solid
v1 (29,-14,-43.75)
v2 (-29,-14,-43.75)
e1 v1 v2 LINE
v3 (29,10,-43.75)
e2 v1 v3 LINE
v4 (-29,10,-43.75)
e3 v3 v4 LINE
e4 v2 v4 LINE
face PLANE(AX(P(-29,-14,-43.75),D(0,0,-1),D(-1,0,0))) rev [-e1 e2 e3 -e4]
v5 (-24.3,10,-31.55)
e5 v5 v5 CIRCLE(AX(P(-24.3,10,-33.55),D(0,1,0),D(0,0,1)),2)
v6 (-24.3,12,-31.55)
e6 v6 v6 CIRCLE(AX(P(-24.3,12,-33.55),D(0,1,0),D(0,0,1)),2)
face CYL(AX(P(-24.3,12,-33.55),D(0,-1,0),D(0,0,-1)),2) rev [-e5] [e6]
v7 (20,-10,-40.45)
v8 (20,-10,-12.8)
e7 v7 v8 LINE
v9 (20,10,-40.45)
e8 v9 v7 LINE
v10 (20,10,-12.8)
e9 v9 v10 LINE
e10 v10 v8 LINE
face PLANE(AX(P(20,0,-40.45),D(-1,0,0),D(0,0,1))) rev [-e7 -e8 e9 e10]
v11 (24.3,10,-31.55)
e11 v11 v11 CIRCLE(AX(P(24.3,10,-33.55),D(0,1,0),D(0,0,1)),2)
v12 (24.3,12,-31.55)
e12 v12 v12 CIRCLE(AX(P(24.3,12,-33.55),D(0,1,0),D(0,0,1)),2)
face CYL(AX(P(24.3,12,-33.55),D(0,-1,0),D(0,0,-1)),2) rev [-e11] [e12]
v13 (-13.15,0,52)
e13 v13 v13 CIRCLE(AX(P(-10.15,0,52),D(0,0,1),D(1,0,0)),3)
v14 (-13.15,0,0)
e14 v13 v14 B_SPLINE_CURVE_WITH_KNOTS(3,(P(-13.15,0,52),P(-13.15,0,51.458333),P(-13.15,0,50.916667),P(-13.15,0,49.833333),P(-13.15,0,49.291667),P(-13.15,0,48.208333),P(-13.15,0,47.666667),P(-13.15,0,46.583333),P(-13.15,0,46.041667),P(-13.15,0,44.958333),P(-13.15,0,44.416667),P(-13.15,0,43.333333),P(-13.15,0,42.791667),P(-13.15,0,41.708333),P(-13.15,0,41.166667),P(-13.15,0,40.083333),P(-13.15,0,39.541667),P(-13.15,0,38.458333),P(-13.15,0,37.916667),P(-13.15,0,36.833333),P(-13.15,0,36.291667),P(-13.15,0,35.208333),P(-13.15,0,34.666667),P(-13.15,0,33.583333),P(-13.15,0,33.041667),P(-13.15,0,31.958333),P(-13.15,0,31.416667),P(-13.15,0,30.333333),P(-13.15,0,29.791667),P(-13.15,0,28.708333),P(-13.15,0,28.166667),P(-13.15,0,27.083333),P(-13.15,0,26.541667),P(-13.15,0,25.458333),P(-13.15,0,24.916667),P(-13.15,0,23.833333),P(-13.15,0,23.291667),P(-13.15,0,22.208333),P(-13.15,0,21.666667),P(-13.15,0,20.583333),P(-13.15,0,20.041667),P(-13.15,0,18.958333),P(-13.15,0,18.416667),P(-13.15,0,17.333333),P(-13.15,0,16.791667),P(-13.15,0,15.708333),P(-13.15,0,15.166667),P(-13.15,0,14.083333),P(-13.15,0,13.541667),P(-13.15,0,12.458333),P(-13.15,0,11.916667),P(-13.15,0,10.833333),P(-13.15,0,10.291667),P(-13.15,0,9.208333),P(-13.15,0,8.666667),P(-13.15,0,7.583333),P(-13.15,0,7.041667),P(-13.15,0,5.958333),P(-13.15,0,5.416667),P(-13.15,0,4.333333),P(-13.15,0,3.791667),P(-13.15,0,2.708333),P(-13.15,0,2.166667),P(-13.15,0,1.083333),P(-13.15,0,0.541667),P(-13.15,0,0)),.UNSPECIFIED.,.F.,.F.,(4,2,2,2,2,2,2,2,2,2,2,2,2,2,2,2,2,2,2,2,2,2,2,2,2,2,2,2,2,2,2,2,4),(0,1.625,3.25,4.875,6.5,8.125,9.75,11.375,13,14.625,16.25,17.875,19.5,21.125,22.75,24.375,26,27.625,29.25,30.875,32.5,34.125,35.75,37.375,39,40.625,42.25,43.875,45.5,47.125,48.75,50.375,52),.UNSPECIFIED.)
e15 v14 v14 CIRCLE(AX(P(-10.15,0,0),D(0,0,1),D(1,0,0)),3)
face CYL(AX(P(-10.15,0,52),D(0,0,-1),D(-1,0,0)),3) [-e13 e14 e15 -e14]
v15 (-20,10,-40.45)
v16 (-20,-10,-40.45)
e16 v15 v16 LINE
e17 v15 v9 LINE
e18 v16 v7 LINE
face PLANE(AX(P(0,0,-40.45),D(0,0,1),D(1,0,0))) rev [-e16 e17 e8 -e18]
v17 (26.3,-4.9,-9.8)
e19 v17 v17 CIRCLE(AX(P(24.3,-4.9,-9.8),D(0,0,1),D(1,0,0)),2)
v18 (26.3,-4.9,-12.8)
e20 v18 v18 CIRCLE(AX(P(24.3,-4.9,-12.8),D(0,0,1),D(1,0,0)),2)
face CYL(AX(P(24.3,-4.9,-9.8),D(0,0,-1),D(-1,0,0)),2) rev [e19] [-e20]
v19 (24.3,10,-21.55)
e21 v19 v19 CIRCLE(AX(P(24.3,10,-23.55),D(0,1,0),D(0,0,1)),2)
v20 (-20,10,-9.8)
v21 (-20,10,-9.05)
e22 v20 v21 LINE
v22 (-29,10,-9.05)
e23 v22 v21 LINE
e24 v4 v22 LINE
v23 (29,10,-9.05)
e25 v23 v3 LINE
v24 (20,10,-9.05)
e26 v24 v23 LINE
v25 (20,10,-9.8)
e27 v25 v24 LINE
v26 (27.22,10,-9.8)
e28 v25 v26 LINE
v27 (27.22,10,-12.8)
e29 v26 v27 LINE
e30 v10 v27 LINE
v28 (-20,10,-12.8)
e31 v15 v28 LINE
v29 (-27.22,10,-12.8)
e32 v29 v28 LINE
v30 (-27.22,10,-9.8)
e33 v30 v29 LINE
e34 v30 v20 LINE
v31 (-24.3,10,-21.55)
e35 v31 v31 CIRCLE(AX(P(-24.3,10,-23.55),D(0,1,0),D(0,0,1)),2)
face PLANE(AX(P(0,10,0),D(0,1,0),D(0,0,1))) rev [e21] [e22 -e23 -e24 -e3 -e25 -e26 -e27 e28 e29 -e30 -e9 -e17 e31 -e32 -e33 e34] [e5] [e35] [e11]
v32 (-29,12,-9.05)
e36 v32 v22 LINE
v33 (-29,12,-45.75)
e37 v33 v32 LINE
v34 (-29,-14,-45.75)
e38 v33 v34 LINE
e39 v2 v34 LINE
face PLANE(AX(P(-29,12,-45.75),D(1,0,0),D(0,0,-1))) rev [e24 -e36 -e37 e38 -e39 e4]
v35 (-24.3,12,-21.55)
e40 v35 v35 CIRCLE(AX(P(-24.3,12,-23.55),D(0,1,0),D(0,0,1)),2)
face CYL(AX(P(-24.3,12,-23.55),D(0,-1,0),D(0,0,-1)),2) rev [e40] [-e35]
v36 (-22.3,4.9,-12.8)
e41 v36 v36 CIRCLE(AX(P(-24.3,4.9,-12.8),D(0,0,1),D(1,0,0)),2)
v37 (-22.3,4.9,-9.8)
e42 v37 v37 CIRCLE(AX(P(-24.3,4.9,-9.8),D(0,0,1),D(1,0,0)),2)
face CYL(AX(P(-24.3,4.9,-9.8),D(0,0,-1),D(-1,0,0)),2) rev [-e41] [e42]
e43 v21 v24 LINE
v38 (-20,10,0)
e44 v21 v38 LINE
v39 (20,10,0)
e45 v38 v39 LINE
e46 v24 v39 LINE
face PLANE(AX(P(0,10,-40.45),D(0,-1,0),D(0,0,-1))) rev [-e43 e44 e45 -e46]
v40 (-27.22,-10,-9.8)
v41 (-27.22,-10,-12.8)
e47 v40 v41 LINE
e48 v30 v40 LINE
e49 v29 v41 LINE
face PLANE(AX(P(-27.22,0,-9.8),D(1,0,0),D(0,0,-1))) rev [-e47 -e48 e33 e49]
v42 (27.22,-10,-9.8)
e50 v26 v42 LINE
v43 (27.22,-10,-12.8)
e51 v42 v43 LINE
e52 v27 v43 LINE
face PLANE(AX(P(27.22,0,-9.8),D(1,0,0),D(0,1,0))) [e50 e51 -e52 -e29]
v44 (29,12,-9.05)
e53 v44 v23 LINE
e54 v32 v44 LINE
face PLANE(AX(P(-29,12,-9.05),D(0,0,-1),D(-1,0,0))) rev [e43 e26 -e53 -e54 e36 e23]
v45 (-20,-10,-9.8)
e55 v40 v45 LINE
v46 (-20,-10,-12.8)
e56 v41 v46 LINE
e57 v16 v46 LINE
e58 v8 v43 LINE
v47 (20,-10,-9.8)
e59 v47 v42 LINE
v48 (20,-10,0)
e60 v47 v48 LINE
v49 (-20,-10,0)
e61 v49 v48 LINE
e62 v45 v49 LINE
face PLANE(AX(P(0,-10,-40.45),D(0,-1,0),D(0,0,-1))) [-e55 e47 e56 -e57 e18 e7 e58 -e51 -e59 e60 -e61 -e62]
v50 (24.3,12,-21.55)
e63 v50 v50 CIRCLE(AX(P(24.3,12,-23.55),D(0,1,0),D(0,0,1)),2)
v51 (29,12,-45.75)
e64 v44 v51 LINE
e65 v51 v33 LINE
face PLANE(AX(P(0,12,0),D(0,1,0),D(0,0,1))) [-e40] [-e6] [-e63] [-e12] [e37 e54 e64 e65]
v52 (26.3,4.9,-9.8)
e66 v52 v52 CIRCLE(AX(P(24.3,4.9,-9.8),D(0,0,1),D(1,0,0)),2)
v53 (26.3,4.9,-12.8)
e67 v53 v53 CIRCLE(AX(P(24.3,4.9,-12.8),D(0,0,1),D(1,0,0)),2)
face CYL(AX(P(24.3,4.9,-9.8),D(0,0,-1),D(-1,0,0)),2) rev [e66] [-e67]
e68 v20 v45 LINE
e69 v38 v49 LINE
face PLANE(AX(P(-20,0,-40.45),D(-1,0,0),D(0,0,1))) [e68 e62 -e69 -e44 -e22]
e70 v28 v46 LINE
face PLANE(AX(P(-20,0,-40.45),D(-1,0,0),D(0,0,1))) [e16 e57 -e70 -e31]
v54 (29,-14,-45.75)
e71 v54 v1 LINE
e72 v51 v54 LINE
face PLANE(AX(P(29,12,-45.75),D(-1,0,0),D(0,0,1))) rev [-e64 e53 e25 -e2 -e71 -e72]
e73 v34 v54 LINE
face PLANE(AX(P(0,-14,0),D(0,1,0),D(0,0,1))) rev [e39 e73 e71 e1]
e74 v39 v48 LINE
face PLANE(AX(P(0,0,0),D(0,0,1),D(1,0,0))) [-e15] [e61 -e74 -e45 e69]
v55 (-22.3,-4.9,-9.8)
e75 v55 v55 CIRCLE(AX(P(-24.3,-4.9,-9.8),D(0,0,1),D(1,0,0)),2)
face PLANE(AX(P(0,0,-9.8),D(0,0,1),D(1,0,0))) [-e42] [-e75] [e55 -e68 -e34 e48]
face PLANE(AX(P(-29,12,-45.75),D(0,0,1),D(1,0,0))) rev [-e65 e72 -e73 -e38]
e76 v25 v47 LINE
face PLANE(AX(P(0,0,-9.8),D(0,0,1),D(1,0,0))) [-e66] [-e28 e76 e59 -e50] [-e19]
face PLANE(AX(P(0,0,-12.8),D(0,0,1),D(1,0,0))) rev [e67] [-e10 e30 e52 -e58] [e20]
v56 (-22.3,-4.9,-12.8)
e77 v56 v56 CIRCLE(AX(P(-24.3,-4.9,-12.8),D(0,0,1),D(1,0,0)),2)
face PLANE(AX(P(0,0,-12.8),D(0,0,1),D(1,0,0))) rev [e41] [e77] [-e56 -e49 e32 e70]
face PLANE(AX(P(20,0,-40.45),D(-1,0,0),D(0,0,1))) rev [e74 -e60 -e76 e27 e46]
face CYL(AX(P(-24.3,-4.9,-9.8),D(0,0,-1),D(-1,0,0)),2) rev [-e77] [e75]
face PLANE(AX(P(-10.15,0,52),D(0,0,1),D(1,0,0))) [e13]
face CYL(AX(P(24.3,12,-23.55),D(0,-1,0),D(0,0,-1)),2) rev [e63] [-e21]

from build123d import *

# Parameters (mm, degrees)
SKETCH2_W           = 40
SKETCH2_H           = 20
BOSS_EXTRUDE1_DEPTH = 40.45
BOSS_EXTRUDE2_START = -12.8
SKETCH2_3_W         = 7.22
SKETCH2_3_H         = 20
SKETCH2_3_R         = 2
BOSS_EXTRUDE2_DEPTH = 3
SKETCH2_4_R         = 3
BOSS_EXTRUDE3_DEPTH = 52
SKETCH3_W           = 58
SKETCH3_H           = 36.7
SKETCH3_R           = 2
BOSS_EXTRUDE4_DEPTH = 2
SKETCH4_W           = 58
SKETCH4_H           = 2
BOSS_EXTRUDE5_DEPTH = 24


with BuildPart() as part:
    # Sketch2 → Boss-Extrude1 (new body)
    with BuildSketch(Plane.XY):
        Rectangle(SKETCH2_W, SKETCH2_H)
    extrude(amount=-BOSS_EXTRUDE1_DEPTH)

    # Sketch2<3> → Boss-Extrude2 (add)
    # profile 1 of 2: a face of its own
    with BuildSketch(Plane.XY.offset(BOSS_EXTRUDE2_START)):
        with Locations((-23.61, 0)):
            Rectangle(SKETCH2_3_W, SKETCH2_3_H)
        with Locations((-24.3, -4.9)):
            Circle(SKETCH2_3_R, mode=Mode.SUBTRACT)
        with Locations((-24.3, 4.9)):
            Circle(SKETCH2_3_R, mode=Mode.SUBTRACT)
    # profile 2 of 2: a face of its own
    with BuildSketch(Plane.XY.offset(BOSS_EXTRUDE2_START)):
        with Locations((23.61, 0)):
            Rectangle(SKETCH2_3_W, SKETCH2_3_H)
        with Locations((24.3, -4.9)):
            Circle(SKETCH2_3_R, mode=Mode.SUBTRACT)
        with Locations((24.3, 4.9)):
            Circle(SKETCH2_3_R, mode=Mode.SUBTRACT)
    extrude(amount=BOSS_EXTRUDE2_DEPTH)

    # Sketch2<4> → Boss-Extrude3 (add)
    with BuildSketch(Plane.XY):
        with Locations((-10.15, 0)):
            Circle(SKETCH2_4_R)
    extrude(amount=BOSS_EXTRUDE3_DEPTH)

    # Sketch3 → Boss-Extrude4 (add)
    with BuildSketch(Plane(origin=(0, 10, 0), x_dir=(1, 0, 0), z_dir=(0, 1, 0))):
        with Locations((0, 27.4)):
            Rectangle(SKETCH3_W, SKETCH3_H)
        with Locations((-24.3, 33.55)):
            Circle(SKETCH3_R, mode=Mode.SUBTRACT)
        with Locations((-24.3, 23.55)):
            Circle(SKETCH3_R, mode=Mode.SUBTRACT)
        with Locations((24.3, 33.55)):
            Circle(SKETCH3_R, mode=Mode.SUBTRACT)
        with Locations((24.3, 23.55)):
            Circle(SKETCH3_R, mode=Mode.SUBTRACT)
    extrude(amount=BOSS_EXTRUDE4_DEPTH)

    # Sketch4 → Boss-Extrude5 (add)
    with BuildSketch(Plane.XZ.offset(-10)):
        with Locations((0, -44.75)):
            Rectangle(SKETCH4_W, SKETCH4_H)
    extrude(amount=BOSS_EXTRUDE5_DEPTH)


solid = part.part
